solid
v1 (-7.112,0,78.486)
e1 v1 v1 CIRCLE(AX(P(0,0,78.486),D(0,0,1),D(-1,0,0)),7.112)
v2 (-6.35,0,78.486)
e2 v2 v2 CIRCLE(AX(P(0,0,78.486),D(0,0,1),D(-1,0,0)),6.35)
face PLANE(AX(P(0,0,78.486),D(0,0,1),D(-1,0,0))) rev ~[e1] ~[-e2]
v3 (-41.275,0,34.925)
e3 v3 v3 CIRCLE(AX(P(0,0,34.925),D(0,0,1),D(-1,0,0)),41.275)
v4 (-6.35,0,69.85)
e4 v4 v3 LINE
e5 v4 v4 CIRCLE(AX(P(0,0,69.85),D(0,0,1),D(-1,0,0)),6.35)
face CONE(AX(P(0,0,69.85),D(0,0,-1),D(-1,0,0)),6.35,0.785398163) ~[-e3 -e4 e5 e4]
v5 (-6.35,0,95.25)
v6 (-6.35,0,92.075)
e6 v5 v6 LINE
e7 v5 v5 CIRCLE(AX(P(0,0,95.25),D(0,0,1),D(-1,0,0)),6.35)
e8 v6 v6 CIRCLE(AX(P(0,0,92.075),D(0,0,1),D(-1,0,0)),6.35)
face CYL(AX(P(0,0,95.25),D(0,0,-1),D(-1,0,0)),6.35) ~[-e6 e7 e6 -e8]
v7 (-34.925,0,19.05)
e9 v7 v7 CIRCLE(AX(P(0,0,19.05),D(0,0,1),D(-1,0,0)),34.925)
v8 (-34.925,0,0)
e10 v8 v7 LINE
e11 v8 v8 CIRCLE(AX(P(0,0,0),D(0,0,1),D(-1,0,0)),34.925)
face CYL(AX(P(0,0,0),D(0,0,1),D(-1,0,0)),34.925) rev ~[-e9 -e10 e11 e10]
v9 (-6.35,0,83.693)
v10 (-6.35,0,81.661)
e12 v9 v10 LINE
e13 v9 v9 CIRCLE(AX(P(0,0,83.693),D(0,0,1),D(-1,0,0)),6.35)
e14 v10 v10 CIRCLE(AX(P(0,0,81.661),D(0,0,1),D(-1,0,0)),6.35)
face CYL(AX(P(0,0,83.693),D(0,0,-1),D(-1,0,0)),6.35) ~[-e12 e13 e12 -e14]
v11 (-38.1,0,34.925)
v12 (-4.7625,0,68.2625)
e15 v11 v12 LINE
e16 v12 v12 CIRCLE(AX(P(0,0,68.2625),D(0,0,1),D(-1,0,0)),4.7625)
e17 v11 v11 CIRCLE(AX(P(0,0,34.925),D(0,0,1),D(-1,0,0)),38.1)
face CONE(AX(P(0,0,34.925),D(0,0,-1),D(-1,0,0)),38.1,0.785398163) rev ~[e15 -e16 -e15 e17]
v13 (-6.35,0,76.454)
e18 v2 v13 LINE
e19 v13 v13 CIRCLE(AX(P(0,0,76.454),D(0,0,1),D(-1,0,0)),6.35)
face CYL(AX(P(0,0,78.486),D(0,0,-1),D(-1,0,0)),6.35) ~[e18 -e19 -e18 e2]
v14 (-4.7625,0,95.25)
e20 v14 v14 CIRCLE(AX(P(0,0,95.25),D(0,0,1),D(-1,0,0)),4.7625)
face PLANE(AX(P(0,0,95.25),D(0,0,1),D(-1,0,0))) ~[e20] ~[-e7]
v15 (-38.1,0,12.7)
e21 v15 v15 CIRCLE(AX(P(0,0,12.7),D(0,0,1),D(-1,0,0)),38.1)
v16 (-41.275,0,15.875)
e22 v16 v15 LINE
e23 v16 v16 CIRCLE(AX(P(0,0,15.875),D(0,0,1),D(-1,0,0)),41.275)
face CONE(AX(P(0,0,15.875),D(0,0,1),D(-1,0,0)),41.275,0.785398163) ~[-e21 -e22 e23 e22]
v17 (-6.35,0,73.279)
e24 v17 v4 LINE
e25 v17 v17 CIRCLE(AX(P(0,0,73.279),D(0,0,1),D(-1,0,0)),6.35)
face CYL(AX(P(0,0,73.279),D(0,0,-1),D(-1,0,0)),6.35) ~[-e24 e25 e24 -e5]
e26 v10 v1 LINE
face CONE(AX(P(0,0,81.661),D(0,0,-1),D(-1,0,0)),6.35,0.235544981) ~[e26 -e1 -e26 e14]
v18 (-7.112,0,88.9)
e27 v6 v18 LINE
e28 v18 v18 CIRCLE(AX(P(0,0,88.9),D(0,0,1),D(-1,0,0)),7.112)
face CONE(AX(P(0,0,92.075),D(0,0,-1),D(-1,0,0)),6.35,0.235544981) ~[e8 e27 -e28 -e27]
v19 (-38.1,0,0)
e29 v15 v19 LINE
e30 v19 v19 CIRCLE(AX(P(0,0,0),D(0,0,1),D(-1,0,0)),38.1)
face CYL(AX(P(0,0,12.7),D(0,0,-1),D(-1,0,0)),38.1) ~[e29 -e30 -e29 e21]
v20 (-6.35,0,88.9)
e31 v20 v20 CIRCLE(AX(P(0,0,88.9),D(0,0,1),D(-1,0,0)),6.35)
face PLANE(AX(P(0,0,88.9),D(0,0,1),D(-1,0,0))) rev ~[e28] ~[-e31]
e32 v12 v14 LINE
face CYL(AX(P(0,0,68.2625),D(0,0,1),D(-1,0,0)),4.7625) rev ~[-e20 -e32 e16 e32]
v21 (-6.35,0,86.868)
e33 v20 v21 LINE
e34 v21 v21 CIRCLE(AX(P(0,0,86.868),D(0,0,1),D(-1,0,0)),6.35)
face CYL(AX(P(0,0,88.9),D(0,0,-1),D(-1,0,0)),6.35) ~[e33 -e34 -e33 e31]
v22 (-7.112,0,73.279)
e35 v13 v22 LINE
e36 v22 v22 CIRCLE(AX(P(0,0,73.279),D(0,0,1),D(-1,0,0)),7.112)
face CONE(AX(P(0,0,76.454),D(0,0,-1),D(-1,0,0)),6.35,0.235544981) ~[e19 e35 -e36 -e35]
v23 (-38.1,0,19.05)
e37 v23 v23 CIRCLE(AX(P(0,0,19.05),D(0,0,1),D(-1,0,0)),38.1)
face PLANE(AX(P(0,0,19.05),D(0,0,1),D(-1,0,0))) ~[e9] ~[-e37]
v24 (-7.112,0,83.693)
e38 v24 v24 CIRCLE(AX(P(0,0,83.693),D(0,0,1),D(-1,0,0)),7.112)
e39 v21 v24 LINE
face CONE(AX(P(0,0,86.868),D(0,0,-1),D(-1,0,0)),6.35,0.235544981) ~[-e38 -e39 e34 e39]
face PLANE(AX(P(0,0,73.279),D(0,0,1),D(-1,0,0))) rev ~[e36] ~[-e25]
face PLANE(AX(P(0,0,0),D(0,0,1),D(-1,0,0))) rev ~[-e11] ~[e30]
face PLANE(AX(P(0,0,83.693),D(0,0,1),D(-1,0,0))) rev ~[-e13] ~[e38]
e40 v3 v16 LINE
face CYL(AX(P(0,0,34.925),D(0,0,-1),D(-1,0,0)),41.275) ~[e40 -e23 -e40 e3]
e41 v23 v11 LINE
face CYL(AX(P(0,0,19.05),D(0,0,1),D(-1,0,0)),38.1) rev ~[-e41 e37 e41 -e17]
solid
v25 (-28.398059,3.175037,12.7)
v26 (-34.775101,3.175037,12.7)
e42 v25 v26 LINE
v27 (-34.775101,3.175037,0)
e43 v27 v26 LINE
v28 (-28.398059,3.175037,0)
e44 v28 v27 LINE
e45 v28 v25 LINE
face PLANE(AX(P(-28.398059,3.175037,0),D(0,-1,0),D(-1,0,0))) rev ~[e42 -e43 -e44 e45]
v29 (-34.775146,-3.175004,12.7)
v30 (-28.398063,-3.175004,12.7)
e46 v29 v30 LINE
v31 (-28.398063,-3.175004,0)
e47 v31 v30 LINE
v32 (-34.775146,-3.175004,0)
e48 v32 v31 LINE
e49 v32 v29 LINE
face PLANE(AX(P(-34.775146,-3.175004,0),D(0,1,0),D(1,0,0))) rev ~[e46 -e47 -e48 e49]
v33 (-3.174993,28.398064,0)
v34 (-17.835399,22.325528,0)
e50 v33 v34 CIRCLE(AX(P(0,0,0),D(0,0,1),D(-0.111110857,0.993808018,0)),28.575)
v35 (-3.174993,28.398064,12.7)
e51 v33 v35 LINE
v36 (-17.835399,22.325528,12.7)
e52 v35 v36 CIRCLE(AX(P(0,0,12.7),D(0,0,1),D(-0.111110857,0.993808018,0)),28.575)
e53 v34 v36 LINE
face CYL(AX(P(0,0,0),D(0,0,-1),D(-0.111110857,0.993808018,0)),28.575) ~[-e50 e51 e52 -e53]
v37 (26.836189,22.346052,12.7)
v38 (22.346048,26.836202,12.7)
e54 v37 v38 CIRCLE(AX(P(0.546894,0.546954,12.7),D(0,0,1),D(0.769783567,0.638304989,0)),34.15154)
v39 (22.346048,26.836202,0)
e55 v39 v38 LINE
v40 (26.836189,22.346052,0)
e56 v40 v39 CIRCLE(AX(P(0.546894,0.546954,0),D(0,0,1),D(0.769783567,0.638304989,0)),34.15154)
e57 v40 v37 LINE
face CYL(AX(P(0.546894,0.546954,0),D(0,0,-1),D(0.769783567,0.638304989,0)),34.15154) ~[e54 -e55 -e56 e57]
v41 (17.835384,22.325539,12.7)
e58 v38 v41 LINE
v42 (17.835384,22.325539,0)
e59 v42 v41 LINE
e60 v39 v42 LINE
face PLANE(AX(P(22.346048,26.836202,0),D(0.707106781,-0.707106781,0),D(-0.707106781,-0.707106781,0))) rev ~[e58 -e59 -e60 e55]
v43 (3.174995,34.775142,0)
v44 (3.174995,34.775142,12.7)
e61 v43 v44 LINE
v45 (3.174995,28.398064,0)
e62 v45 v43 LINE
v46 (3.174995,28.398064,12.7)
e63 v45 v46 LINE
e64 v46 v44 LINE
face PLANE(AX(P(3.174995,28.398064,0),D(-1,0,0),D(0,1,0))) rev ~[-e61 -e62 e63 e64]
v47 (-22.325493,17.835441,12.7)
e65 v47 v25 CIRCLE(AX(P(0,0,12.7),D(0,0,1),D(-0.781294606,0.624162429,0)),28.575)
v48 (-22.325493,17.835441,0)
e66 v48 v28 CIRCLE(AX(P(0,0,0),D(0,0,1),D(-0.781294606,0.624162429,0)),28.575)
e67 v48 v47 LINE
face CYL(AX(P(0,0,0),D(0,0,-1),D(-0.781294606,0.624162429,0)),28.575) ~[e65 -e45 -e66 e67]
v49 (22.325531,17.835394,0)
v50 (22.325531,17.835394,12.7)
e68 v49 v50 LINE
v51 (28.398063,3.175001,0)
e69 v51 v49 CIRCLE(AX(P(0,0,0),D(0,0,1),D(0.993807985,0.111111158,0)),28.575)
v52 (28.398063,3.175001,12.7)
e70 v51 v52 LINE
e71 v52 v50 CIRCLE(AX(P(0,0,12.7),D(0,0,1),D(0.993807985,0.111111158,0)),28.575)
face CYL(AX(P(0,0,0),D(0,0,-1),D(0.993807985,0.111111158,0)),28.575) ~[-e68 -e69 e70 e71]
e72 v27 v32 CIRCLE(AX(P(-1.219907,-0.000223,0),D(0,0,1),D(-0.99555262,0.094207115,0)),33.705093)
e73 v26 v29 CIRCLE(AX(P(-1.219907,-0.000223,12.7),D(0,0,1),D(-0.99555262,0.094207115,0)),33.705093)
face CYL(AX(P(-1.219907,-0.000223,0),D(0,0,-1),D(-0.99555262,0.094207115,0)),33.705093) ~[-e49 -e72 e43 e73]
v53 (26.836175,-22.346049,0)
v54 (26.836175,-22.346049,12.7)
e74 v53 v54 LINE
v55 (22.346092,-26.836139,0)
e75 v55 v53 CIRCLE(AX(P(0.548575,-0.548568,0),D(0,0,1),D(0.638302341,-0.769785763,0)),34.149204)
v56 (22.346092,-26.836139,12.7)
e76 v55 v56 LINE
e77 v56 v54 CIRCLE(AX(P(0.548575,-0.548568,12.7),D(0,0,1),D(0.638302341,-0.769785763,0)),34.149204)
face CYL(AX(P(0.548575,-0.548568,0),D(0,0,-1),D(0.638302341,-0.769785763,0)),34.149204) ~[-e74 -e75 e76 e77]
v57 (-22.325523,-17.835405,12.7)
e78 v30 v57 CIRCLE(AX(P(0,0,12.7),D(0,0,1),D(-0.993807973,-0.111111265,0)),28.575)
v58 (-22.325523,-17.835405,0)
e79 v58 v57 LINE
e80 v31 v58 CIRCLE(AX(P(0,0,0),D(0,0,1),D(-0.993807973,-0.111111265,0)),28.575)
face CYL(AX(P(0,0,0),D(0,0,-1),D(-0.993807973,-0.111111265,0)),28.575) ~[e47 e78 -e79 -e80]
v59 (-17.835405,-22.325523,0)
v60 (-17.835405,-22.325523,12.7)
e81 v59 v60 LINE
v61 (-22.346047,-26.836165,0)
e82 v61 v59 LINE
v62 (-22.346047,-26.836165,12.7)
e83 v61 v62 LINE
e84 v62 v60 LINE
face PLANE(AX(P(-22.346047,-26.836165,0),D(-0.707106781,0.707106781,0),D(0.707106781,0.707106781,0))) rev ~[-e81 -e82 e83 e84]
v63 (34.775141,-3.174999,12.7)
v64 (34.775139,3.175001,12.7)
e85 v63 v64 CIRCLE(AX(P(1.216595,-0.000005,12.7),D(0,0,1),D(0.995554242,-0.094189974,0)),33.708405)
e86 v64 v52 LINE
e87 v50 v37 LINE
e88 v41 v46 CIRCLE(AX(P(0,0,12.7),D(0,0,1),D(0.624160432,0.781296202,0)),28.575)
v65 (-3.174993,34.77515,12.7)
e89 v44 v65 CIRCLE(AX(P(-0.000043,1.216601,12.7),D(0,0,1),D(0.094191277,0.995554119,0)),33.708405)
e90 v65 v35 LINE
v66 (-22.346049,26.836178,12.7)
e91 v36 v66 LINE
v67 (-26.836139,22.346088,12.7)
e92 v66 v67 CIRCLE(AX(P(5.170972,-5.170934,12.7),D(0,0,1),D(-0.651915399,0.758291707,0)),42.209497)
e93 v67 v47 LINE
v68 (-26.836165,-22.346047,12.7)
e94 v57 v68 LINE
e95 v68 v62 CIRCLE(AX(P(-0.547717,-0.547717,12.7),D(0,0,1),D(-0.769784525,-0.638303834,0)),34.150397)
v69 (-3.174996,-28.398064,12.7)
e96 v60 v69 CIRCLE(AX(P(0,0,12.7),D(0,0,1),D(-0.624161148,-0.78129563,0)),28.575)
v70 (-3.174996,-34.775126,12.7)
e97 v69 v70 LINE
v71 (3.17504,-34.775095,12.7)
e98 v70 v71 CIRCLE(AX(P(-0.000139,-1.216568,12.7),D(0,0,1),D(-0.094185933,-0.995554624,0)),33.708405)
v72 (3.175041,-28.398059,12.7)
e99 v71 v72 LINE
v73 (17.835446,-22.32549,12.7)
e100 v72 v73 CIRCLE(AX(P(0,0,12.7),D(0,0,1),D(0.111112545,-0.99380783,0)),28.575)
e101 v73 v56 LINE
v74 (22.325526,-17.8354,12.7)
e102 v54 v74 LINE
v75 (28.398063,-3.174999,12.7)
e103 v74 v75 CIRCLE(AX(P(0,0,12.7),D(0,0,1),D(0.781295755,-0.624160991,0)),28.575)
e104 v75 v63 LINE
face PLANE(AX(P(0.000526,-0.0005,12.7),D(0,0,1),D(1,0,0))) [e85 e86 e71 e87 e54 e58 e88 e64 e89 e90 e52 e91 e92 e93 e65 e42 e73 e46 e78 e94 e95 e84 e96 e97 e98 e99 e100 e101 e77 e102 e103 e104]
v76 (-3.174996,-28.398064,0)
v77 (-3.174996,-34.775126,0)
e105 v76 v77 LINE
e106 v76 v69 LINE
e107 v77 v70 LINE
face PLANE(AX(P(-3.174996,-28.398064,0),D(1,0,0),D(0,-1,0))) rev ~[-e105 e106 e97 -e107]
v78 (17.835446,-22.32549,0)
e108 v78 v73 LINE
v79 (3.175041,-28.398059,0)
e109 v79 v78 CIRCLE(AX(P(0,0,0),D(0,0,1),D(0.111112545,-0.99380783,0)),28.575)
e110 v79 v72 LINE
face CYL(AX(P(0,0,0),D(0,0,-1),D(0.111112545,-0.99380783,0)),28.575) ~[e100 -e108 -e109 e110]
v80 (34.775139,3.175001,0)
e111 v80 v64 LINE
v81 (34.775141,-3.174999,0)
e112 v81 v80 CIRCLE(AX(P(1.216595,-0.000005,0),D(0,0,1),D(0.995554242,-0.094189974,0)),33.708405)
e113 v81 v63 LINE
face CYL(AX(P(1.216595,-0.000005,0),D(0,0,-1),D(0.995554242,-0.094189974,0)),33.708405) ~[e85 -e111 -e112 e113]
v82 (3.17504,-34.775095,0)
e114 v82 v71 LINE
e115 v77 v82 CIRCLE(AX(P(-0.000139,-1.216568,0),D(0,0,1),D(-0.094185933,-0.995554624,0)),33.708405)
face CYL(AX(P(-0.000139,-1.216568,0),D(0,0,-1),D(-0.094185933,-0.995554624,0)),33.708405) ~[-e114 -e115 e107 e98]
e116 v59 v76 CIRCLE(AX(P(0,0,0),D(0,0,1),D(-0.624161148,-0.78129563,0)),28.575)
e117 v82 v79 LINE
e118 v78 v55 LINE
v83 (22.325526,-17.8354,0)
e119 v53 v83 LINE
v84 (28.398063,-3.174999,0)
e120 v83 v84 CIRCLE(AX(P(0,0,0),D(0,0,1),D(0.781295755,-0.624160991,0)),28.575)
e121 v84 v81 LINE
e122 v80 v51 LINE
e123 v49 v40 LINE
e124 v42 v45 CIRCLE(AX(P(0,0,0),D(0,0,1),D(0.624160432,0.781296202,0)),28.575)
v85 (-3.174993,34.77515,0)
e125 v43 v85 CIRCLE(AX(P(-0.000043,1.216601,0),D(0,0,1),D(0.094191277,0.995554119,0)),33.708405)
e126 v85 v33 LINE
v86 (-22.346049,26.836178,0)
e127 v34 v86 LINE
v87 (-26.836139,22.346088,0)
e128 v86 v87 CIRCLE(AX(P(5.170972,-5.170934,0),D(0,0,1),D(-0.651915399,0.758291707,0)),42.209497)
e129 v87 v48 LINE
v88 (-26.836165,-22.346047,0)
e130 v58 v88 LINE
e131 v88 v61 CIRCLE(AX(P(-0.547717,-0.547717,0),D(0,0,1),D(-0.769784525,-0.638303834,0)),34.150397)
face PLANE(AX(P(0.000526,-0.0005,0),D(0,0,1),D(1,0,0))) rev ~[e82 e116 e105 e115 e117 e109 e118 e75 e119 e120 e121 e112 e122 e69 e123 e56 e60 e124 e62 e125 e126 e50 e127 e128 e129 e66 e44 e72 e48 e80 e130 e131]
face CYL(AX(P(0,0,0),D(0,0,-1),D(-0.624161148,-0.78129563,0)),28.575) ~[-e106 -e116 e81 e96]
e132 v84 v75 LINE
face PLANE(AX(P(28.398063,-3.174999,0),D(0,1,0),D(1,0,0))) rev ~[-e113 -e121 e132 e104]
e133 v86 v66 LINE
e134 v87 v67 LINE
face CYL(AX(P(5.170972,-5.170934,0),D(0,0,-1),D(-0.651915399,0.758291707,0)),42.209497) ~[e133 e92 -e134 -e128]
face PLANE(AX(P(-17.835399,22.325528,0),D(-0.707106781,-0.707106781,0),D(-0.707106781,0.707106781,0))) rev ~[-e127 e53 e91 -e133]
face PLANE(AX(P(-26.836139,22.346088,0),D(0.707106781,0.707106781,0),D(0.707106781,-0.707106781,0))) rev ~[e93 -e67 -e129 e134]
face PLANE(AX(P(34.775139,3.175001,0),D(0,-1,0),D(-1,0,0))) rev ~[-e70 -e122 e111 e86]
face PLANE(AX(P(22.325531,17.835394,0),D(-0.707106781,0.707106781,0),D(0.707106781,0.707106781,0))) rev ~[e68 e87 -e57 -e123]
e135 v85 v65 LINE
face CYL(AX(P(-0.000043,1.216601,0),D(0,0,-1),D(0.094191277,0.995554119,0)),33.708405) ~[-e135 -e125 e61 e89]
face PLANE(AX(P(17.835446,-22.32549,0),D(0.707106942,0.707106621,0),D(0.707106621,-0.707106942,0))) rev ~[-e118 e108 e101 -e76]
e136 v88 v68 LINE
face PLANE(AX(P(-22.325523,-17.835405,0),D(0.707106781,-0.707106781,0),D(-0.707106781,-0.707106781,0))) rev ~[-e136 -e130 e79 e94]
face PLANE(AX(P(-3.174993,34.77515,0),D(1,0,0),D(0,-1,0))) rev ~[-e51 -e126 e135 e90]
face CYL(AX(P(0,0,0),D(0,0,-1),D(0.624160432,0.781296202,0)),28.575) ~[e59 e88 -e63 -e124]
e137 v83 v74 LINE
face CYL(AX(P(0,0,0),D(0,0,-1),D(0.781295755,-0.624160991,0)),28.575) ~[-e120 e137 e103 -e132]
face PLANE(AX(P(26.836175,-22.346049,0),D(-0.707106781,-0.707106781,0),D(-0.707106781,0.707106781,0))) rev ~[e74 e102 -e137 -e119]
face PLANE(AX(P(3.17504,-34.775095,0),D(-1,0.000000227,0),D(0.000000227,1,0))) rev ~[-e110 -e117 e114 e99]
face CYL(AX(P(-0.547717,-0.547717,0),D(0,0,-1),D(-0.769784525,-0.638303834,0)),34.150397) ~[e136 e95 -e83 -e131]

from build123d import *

# Parameters (mm, degrees)
F3_DEPTH = 12.7


with BuildPart() as f1:
    # F0 (on Front) → F1 (revolve)
    with BuildSketch(Plane.XZ):
        Polygon((-38.1, 0), (-34.925, 0), (-34.925, 19.05), (-38.1, 19.05), (-38.1, 34.925), (-4.7625, 68.2625), (-4.7625, 95.25), (-6.35, 95.25), (-6.35, 92.075), (-7.112, 88.9), (-6.35, 88.9), (-6.35, 86.868), (-7.112, 83.693), (-6.35, 83.693), (-6.35, 81.661), (-7.112, 78.486), (-6.35, 78.486), (-6.35, 76.454), (-7.112, 73.279), (-6.35, 73.279), (-6.35, 69.85), (-41.275, 34.925), (-41.275, 15.875), (-38.1, 12.7), align=None)
    revolve(axis=Axis((0, 0, 50.8), (0, 0, 1)))


with BuildPart() as f3:
    # F2 (on Top) → F3 (new body)
    with BuildSketch(Plane.XY):
        with BuildLine():
            Line((-3.1749960745, -28.3980637531), (-3.1749960745, -34.7751258129))
            ThreePointArc((-3.1749960745, -34.7751258129), (2.24367e-05, -34.9249723343), (3.1750395166, -34.7750954884))
            Line((3.1750395166, -34.7750954884), (3.1750409639, -28.3980587343))
            ThreePointArc((3.1750409639, -28.3980587343), (10.9352255737, -26.3998383831), (17.8354455442, -22.3254900783))
            Line((17.8354455442, -22.3254900783), (22.3460920856, -26.8361386672))
            ThreePointArc((22.3460920856, -26.8361386672), (24.695725028, -24.6956852351), (26.8361753226, -22.3460494346))
            Line((26.8361753226, -22.3460494346), (22.3255262075, -17.8354003195))
            ThreePointArc((22.3255262075, -17.8354003195), (26.3998576023, -10.9351791745), (28.3980634632, -3.1749986674))
            Line((28.3980634632, -3.1749986674), (34.7751405906, -3.1749986674))
            ThreePointArc((34.7751405906, -3.1749986674), (34.925, 1.3605e-06), (34.7751394094, 3.1750013326))
            Line((34.7751394094, 3.1750013326), (28.3980631653, 3.1750013326))
            ThreePointArc((28.3980631653, 3.1750013326), (26.3998585218, 10.9351769545), (22.3255308809, 17.8353944696))
            Line((22.3255308809, 17.8353944696), (26.8361885113, 22.3460520999))
            ThreePointArc((26.8361885113, 22.3460520999), (24.6957050465, 24.6957139393), (22.3460476901, 26.8362023251))
            Line((22.3460476901, 26.8362023251), (17.835384339, 22.325538974))
            ThreePointArc((17.835384339, 22.325538974), (10.9351680084, 26.3998622274), (3.1749949722, 28.3980638764))
            Line((3.1749949722, 28.3980638764), (3.1749949722, 34.7751420859))
            ThreePointArc((3.1749949722, 34.7751420859), (1.3068e-06, 34.9250056515), (-3.17499275, 34.7751503786))
            Line((-3.17499275, 34.7751503786), (-3.17499275, 28.3980641248))
            ThreePointArc((-3.17499275, 28.3980641248), (-10.9351754232, 26.3998591561), (-17.8353986269, 22.3255275597))
            Line((-17.8353986269, 22.3255275597), (-22.3460490284, 26.8361779611))
            ThreePointArc((-22.3460490284, 26.8361779611), (-24.6756495106, 24.6756879964), (-26.8361394753, 22.3460875142))
            Line((-26.8361394753, 22.3460875142), (-22.3254933767, 17.8354414156))
            ThreePointArc((-22.3254933767, 17.8354414156), (-26.3998402061, 10.9352211725), (-28.3980592058, 3.1750367469))
            Line((-28.3980592058, 3.1750367469), (-34.7751006475, 3.1750367469))
            ThreePointArc((-34.7751006475, 3.1750367469), (-34.9249999999, 1.72484e-05), (-34.7751458819, -3.1750043854))
            Line((-34.7751458819, -3.1750043854), (-28.3980628239, -3.1750043854))
            ThreePointArc((-28.3980628239, -3.1750043854), (-26.3998554001, -10.935184491), (-22.3255226152, -17.8354048162))
            Line((-22.3255226152, -17.8354048162), (-26.8361646407, -22.3460468418))
            ThreePointArc((-26.8361646407, -22.3460468418), (-24.6956947976, -24.6956947976), (-22.3460468418, -26.8361646407))
            Line((-22.3460468418, -26.8361646407), (-17.8354048162, -22.3255226152))
            ThreePointArc((-17.8354048162, -22.3255226152), (-10.9351806279, -26.3998570003), (-3.1749960745, -28.3980637531))
        make_face()
    extrude(amount=F3_DEPTH)


solid = Compound([f1.part, f3.part])
